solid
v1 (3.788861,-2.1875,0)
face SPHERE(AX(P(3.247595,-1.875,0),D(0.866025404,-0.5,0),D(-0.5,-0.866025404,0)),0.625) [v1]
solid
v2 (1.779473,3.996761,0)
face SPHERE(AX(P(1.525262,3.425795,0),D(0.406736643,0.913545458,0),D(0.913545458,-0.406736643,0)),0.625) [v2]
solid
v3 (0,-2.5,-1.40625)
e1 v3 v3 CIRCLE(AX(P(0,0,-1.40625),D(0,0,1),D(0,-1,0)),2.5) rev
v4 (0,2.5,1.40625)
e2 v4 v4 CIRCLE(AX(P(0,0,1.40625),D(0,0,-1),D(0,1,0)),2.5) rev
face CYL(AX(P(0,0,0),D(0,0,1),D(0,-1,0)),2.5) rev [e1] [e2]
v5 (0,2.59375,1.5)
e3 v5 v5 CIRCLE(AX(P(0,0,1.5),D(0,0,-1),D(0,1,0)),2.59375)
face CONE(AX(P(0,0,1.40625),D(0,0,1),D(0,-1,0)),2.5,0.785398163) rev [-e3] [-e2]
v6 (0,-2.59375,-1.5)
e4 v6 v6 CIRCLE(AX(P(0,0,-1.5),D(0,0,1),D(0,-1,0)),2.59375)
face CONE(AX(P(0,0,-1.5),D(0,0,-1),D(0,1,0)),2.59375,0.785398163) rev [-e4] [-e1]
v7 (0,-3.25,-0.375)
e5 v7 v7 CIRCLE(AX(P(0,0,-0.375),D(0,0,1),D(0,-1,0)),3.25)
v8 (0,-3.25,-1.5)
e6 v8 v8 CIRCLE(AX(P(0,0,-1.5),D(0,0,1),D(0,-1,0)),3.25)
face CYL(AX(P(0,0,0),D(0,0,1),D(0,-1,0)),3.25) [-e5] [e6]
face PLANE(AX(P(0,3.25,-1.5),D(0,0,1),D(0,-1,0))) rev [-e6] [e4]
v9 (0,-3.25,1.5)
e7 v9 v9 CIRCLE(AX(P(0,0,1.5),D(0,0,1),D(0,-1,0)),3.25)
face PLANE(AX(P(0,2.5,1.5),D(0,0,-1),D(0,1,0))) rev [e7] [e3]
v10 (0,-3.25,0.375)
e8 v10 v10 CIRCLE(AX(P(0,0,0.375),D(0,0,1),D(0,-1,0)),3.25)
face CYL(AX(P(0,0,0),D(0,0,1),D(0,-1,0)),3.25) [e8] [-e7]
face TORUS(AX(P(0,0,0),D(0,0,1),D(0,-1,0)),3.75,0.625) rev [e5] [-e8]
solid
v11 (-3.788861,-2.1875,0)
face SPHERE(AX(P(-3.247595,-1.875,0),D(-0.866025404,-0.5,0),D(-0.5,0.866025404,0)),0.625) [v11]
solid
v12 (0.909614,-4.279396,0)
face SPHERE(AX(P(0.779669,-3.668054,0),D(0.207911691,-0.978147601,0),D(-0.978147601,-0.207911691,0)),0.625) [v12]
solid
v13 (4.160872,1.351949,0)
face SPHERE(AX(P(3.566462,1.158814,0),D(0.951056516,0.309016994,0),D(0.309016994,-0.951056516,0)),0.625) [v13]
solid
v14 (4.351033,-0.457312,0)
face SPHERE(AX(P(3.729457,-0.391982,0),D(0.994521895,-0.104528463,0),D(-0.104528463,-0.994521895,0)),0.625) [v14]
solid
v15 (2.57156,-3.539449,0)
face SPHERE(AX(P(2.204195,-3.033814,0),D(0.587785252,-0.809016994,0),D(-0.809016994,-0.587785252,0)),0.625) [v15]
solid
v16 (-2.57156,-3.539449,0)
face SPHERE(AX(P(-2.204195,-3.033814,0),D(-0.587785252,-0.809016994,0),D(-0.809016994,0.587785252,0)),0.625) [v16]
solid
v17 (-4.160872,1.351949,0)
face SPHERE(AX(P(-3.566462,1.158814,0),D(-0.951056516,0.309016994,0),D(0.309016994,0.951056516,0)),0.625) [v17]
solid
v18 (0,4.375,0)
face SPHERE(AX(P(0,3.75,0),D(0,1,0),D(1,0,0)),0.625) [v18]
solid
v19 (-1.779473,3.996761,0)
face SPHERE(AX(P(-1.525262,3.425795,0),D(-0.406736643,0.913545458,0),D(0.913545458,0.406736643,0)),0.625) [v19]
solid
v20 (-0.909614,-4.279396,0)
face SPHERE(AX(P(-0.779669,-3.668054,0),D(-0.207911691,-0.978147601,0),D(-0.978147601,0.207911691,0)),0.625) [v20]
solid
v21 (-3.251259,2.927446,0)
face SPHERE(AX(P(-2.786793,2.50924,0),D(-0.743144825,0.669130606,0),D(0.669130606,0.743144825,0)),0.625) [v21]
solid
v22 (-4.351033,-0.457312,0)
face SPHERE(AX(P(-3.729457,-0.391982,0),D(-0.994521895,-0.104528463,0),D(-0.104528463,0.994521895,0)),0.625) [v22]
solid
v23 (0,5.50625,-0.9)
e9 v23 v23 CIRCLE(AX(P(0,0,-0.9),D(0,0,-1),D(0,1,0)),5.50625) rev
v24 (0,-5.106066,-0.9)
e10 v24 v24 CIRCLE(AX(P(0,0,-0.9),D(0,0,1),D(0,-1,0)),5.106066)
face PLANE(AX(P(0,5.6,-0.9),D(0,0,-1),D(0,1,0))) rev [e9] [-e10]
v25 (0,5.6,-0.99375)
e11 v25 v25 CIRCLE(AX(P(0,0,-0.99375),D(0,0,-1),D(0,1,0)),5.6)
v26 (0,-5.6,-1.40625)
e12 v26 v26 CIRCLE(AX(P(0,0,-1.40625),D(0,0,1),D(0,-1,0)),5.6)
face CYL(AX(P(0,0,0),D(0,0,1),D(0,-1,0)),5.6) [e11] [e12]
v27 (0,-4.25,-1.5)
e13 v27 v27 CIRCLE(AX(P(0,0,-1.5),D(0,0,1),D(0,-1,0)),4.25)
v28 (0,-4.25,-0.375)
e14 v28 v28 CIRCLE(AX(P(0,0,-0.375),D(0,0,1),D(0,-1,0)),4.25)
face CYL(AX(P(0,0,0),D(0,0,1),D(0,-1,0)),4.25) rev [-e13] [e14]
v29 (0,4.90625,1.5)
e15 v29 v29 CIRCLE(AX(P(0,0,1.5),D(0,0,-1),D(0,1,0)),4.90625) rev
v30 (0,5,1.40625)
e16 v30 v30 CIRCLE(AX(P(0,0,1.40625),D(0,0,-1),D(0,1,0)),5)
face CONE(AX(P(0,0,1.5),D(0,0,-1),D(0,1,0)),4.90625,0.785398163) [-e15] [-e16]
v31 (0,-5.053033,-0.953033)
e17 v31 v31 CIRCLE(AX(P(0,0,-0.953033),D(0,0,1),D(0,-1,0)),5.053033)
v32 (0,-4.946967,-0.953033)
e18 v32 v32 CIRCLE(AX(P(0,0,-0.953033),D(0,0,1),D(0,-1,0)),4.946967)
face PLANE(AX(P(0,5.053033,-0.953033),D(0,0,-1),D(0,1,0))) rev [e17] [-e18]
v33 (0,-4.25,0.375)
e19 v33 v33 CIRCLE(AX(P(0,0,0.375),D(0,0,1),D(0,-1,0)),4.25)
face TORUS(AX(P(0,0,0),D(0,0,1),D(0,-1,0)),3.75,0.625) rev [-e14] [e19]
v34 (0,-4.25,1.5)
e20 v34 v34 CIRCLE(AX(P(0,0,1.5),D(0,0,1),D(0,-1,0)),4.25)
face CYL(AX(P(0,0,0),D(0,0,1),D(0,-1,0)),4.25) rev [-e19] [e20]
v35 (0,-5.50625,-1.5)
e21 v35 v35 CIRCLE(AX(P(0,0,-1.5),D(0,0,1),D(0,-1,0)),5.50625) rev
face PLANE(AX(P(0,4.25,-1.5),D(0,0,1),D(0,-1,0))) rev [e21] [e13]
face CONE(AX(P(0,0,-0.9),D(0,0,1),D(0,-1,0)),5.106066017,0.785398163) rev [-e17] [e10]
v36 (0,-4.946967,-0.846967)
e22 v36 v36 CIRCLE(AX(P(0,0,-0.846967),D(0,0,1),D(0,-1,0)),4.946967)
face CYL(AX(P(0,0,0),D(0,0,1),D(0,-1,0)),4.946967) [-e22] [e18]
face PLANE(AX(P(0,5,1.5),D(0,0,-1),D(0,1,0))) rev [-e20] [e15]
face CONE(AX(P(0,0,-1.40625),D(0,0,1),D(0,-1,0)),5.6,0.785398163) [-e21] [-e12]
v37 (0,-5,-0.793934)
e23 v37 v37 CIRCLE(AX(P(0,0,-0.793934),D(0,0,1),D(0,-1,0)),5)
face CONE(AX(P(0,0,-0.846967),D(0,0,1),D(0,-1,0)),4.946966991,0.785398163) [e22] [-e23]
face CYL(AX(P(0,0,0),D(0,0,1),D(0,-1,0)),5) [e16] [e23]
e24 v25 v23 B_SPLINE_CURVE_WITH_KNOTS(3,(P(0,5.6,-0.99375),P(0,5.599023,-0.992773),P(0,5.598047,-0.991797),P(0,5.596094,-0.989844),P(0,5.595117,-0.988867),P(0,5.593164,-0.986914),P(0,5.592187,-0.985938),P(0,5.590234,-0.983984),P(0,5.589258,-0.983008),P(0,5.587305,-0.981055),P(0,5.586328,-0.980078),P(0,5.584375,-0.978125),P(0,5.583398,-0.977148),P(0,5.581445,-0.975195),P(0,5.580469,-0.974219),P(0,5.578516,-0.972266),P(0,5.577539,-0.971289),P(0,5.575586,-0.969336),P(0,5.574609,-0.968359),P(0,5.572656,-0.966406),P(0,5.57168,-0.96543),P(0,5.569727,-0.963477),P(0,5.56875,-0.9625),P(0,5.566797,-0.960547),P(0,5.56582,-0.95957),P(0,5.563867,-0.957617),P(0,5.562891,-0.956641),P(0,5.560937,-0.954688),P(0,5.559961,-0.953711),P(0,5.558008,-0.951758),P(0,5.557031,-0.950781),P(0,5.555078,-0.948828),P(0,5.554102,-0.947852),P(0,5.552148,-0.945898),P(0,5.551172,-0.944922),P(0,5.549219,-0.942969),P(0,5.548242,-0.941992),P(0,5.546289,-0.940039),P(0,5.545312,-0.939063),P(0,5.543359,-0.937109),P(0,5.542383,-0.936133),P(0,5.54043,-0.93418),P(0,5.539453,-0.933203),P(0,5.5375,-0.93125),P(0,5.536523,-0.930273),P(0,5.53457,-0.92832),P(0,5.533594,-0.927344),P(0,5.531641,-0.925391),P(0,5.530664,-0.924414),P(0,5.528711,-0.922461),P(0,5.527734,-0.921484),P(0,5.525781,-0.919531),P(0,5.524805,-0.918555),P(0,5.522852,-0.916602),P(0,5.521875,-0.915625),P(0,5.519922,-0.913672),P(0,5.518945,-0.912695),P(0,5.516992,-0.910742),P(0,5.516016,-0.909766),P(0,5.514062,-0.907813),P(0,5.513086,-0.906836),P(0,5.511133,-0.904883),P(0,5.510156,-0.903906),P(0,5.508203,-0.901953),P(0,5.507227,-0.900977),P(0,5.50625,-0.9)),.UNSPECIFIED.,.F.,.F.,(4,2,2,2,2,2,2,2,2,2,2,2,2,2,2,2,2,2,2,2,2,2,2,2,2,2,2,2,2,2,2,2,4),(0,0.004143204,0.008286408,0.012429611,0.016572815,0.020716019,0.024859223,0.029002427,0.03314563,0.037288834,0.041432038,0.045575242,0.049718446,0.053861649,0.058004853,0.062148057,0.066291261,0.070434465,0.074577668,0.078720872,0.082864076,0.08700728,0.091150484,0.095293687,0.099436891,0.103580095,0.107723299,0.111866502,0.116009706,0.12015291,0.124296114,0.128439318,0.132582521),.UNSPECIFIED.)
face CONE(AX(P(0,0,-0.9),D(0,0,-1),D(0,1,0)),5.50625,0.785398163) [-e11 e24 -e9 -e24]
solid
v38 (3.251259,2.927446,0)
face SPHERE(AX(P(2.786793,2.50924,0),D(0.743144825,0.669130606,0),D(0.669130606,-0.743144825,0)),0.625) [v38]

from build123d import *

# Parameters (mm, degrees)
FILLET1_SIZE      = 0.09375
FILLET2_SIZE      = 0.09375
CIRPATTERN3_COUNT = 15


with BuildPart() as part:
    # Sketch2 → Revolve1 (revolve)
    with BuildSketch(Plane(origin=(0, 0, 0), x_dir=(0, 0, -1), z_dir=(1, 0, 0))):
        with BuildLine():
            Line((1.5, 5.6), (0.9, 5.6))
            Line((0.9, 5.6), (0.9, 5.106066017))
            Line((0.9, 5.106066017), (0.953033009, 5.053033009))
            Line((0.953033009, 5.053033009), (0.953033009, 4.946966991))
            Line((0.953033009, 4.946966991), (0.846966991, 4.946966991))
            Line((0.846966991, 4.946966991), (0.793933983, 5))
            Line((0.793933983, 5), (-1.5, 5))
            Line((-1.5, 5), (-1.5, 4.25))
            Line((-1.5, 4.25), (-0.375, 4.25))
            ThreePointArc((-0.375, 4.25), (0, 4.375), (0.375, 4.25))
            Line((0.375, 4.25), (1.5, 4.25))
            Line((1.5, 4.25), (1.5, 5.6))
        make_face()
        with BuildLine():
            Line((1.5, 2.5), (-1.5, 2.5))
            Line((-1.5, 2.5), (-1.5, 3.25))
            Line((-1.5, 3.25), (-0.375, 3.25))
            ThreePointArc((-0.375, 3.25), (0, 3.125), (0.375, 3.25))
            Line((0.375, 3.25), (1.5, 3.25))
            Line((1.5, 3.25), (1.5, 2.5))
        make_face()
    revolve(axis=Axis((0, 0, 0), (0, 0, -1)))

    # Fillet1
    fillet1_edges = [part.edges().sort_by_distance(p)[0] for p in [
        (0, -5.6, -1.5),
        (0, -5.6, -0.9),
        (0, -5, 1.5),
    ]]
    chamfer(fillet1_edges, length=FILLET1_SIZE)

    # Fillet2
    fillet2_edges = [part.edges().sort_by_distance(p)[0] for p in [
        (0, -2.5, -1.5),
        (0, -2.5, 1.5),
    ]]
    chamfer(fillet2_edges, length=FILLET2_SIZE)


with BuildPart() as body_2:
    # Sketch7 → Revolve3 (revolve)
    with BuildSketch(Plane.XY):
        with BuildLine():
            Line((0, 4.375), (0, 3.125))
            ThreePointArc((0, 3.125), (-0.625, 3.75), (0, 4.375))
        make_face()
    revolve(axis=Axis((0, 4.375, 0), (0, -1, 0)))


with BuildPart() as cirpattern3_1:
    # CirPattern3: pattern copy
    add(body_2.part.rotate(Axis((0, 0, 0), (0, 0, -1)), 1 * 360 / CIRPATTERN3_COUNT))


with BuildPart() as cirpattern3_2:
    # CirPattern3: pattern copy
    add(body_2.part.rotate(Axis((0, 0, 0), (0, 0, -1)), 2 * 360 / CIRPATTERN3_COUNT))


with BuildPart() as cirpattern3_3:
    # CirPattern3: pattern copy
    add(body_2.part.rotate(Axis((0, 0, 0), (0, 0, -1)), 3 * 360 / CIRPATTERN3_COUNT))


with BuildPart() as cirpattern3_4:
    # CirPattern3: pattern copy
    add(body_2.part.rotate(Axis((0, 0, 0), (0, 0, -1)), 4 * 360 / CIRPATTERN3_COUNT))


with BuildPart() as cirpattern3_5:
    # CirPattern3: pattern copy
    add(body_2.part.rotate(Axis((0, 0, 0), (0, 0, -1)), 5 * 360 / CIRPATTERN3_COUNT))


with BuildPart() as cirpattern3_6:
    # CirPattern3: pattern copy
    add(body_2.part.rotate(Axis((0, 0, 0), (0, 0, -1)), 6 * 360 / CIRPATTERN3_COUNT))


with BuildPart() as cirpattern3_7:
    # CirPattern3: pattern copy
    add(body_2.part.rotate(Axis((0, 0, 0), (0, 0, -1)), 7 * 360 / CIRPATTERN3_COUNT))


with BuildPart() as cirpattern3_8:
    # CirPattern3: pattern copy
    add(body_2.part.rotate(Axis((0, 0, 0), (0, 0, -1)), 8 * 360 / CIRPATTERN3_COUNT))


with BuildPart() as cirpattern3_9:
    # CirPattern3: pattern copy
    add(body_2.part.rotate(Axis((0, 0, 0), (0, 0, -1)), 9 * 360 / CIRPATTERN3_COUNT))


with BuildPart() as cirpattern3_10:
    # CirPattern3: pattern copy
    add(body_2.part.rotate(Axis((0, 0, 0), (0, 0, -1)), 10 * 360 / CIRPATTERN3_COUNT))


with BuildPart() as cirpattern3_11:
    # CirPattern3: pattern copy
    add(body_2.part.rotate(Axis((0, 0, 0), (0, 0, -1)), 11 * 360 / CIRPATTERN3_COUNT))


with BuildPart() as cirpattern3_12:
    # CirPattern3: pattern copy
    add(body_2.part.rotate(Axis((0, 0, 0), (0, 0, -1)), 12 * 360 / CIRPATTERN3_COUNT))


with BuildPart() as cirpattern3_13:
    # CirPattern3: pattern copy
    add(body_2.part.rotate(Axis((0, 0, 0), (0, 0, -1)), 13 * 360 / CIRPATTERN3_COUNT))


with BuildPart() as cirpattern3_14:
    # CirPattern3: pattern copy
    add(body_2.part.rotate(Axis((0, 0, 0), (0, 0, -1)), 14 * 360 / CIRPATTERN3_COUNT))


solid = Compound([part.part, body_2.part, cirpattern3_1.part, cirpattern3_2.part, cirpattern3_3.part, cirpattern3_4.part, cirpattern3_5.part, cirpattern3_6.part, cirpattern3_7.part, cirpattern3_8.part, cirpattern3_9.part, cirpattern3_10.part, cirpattern3_11.part, cirpattern3_12.part, cirpattern3_13.part, cirpattern3_14.part])
